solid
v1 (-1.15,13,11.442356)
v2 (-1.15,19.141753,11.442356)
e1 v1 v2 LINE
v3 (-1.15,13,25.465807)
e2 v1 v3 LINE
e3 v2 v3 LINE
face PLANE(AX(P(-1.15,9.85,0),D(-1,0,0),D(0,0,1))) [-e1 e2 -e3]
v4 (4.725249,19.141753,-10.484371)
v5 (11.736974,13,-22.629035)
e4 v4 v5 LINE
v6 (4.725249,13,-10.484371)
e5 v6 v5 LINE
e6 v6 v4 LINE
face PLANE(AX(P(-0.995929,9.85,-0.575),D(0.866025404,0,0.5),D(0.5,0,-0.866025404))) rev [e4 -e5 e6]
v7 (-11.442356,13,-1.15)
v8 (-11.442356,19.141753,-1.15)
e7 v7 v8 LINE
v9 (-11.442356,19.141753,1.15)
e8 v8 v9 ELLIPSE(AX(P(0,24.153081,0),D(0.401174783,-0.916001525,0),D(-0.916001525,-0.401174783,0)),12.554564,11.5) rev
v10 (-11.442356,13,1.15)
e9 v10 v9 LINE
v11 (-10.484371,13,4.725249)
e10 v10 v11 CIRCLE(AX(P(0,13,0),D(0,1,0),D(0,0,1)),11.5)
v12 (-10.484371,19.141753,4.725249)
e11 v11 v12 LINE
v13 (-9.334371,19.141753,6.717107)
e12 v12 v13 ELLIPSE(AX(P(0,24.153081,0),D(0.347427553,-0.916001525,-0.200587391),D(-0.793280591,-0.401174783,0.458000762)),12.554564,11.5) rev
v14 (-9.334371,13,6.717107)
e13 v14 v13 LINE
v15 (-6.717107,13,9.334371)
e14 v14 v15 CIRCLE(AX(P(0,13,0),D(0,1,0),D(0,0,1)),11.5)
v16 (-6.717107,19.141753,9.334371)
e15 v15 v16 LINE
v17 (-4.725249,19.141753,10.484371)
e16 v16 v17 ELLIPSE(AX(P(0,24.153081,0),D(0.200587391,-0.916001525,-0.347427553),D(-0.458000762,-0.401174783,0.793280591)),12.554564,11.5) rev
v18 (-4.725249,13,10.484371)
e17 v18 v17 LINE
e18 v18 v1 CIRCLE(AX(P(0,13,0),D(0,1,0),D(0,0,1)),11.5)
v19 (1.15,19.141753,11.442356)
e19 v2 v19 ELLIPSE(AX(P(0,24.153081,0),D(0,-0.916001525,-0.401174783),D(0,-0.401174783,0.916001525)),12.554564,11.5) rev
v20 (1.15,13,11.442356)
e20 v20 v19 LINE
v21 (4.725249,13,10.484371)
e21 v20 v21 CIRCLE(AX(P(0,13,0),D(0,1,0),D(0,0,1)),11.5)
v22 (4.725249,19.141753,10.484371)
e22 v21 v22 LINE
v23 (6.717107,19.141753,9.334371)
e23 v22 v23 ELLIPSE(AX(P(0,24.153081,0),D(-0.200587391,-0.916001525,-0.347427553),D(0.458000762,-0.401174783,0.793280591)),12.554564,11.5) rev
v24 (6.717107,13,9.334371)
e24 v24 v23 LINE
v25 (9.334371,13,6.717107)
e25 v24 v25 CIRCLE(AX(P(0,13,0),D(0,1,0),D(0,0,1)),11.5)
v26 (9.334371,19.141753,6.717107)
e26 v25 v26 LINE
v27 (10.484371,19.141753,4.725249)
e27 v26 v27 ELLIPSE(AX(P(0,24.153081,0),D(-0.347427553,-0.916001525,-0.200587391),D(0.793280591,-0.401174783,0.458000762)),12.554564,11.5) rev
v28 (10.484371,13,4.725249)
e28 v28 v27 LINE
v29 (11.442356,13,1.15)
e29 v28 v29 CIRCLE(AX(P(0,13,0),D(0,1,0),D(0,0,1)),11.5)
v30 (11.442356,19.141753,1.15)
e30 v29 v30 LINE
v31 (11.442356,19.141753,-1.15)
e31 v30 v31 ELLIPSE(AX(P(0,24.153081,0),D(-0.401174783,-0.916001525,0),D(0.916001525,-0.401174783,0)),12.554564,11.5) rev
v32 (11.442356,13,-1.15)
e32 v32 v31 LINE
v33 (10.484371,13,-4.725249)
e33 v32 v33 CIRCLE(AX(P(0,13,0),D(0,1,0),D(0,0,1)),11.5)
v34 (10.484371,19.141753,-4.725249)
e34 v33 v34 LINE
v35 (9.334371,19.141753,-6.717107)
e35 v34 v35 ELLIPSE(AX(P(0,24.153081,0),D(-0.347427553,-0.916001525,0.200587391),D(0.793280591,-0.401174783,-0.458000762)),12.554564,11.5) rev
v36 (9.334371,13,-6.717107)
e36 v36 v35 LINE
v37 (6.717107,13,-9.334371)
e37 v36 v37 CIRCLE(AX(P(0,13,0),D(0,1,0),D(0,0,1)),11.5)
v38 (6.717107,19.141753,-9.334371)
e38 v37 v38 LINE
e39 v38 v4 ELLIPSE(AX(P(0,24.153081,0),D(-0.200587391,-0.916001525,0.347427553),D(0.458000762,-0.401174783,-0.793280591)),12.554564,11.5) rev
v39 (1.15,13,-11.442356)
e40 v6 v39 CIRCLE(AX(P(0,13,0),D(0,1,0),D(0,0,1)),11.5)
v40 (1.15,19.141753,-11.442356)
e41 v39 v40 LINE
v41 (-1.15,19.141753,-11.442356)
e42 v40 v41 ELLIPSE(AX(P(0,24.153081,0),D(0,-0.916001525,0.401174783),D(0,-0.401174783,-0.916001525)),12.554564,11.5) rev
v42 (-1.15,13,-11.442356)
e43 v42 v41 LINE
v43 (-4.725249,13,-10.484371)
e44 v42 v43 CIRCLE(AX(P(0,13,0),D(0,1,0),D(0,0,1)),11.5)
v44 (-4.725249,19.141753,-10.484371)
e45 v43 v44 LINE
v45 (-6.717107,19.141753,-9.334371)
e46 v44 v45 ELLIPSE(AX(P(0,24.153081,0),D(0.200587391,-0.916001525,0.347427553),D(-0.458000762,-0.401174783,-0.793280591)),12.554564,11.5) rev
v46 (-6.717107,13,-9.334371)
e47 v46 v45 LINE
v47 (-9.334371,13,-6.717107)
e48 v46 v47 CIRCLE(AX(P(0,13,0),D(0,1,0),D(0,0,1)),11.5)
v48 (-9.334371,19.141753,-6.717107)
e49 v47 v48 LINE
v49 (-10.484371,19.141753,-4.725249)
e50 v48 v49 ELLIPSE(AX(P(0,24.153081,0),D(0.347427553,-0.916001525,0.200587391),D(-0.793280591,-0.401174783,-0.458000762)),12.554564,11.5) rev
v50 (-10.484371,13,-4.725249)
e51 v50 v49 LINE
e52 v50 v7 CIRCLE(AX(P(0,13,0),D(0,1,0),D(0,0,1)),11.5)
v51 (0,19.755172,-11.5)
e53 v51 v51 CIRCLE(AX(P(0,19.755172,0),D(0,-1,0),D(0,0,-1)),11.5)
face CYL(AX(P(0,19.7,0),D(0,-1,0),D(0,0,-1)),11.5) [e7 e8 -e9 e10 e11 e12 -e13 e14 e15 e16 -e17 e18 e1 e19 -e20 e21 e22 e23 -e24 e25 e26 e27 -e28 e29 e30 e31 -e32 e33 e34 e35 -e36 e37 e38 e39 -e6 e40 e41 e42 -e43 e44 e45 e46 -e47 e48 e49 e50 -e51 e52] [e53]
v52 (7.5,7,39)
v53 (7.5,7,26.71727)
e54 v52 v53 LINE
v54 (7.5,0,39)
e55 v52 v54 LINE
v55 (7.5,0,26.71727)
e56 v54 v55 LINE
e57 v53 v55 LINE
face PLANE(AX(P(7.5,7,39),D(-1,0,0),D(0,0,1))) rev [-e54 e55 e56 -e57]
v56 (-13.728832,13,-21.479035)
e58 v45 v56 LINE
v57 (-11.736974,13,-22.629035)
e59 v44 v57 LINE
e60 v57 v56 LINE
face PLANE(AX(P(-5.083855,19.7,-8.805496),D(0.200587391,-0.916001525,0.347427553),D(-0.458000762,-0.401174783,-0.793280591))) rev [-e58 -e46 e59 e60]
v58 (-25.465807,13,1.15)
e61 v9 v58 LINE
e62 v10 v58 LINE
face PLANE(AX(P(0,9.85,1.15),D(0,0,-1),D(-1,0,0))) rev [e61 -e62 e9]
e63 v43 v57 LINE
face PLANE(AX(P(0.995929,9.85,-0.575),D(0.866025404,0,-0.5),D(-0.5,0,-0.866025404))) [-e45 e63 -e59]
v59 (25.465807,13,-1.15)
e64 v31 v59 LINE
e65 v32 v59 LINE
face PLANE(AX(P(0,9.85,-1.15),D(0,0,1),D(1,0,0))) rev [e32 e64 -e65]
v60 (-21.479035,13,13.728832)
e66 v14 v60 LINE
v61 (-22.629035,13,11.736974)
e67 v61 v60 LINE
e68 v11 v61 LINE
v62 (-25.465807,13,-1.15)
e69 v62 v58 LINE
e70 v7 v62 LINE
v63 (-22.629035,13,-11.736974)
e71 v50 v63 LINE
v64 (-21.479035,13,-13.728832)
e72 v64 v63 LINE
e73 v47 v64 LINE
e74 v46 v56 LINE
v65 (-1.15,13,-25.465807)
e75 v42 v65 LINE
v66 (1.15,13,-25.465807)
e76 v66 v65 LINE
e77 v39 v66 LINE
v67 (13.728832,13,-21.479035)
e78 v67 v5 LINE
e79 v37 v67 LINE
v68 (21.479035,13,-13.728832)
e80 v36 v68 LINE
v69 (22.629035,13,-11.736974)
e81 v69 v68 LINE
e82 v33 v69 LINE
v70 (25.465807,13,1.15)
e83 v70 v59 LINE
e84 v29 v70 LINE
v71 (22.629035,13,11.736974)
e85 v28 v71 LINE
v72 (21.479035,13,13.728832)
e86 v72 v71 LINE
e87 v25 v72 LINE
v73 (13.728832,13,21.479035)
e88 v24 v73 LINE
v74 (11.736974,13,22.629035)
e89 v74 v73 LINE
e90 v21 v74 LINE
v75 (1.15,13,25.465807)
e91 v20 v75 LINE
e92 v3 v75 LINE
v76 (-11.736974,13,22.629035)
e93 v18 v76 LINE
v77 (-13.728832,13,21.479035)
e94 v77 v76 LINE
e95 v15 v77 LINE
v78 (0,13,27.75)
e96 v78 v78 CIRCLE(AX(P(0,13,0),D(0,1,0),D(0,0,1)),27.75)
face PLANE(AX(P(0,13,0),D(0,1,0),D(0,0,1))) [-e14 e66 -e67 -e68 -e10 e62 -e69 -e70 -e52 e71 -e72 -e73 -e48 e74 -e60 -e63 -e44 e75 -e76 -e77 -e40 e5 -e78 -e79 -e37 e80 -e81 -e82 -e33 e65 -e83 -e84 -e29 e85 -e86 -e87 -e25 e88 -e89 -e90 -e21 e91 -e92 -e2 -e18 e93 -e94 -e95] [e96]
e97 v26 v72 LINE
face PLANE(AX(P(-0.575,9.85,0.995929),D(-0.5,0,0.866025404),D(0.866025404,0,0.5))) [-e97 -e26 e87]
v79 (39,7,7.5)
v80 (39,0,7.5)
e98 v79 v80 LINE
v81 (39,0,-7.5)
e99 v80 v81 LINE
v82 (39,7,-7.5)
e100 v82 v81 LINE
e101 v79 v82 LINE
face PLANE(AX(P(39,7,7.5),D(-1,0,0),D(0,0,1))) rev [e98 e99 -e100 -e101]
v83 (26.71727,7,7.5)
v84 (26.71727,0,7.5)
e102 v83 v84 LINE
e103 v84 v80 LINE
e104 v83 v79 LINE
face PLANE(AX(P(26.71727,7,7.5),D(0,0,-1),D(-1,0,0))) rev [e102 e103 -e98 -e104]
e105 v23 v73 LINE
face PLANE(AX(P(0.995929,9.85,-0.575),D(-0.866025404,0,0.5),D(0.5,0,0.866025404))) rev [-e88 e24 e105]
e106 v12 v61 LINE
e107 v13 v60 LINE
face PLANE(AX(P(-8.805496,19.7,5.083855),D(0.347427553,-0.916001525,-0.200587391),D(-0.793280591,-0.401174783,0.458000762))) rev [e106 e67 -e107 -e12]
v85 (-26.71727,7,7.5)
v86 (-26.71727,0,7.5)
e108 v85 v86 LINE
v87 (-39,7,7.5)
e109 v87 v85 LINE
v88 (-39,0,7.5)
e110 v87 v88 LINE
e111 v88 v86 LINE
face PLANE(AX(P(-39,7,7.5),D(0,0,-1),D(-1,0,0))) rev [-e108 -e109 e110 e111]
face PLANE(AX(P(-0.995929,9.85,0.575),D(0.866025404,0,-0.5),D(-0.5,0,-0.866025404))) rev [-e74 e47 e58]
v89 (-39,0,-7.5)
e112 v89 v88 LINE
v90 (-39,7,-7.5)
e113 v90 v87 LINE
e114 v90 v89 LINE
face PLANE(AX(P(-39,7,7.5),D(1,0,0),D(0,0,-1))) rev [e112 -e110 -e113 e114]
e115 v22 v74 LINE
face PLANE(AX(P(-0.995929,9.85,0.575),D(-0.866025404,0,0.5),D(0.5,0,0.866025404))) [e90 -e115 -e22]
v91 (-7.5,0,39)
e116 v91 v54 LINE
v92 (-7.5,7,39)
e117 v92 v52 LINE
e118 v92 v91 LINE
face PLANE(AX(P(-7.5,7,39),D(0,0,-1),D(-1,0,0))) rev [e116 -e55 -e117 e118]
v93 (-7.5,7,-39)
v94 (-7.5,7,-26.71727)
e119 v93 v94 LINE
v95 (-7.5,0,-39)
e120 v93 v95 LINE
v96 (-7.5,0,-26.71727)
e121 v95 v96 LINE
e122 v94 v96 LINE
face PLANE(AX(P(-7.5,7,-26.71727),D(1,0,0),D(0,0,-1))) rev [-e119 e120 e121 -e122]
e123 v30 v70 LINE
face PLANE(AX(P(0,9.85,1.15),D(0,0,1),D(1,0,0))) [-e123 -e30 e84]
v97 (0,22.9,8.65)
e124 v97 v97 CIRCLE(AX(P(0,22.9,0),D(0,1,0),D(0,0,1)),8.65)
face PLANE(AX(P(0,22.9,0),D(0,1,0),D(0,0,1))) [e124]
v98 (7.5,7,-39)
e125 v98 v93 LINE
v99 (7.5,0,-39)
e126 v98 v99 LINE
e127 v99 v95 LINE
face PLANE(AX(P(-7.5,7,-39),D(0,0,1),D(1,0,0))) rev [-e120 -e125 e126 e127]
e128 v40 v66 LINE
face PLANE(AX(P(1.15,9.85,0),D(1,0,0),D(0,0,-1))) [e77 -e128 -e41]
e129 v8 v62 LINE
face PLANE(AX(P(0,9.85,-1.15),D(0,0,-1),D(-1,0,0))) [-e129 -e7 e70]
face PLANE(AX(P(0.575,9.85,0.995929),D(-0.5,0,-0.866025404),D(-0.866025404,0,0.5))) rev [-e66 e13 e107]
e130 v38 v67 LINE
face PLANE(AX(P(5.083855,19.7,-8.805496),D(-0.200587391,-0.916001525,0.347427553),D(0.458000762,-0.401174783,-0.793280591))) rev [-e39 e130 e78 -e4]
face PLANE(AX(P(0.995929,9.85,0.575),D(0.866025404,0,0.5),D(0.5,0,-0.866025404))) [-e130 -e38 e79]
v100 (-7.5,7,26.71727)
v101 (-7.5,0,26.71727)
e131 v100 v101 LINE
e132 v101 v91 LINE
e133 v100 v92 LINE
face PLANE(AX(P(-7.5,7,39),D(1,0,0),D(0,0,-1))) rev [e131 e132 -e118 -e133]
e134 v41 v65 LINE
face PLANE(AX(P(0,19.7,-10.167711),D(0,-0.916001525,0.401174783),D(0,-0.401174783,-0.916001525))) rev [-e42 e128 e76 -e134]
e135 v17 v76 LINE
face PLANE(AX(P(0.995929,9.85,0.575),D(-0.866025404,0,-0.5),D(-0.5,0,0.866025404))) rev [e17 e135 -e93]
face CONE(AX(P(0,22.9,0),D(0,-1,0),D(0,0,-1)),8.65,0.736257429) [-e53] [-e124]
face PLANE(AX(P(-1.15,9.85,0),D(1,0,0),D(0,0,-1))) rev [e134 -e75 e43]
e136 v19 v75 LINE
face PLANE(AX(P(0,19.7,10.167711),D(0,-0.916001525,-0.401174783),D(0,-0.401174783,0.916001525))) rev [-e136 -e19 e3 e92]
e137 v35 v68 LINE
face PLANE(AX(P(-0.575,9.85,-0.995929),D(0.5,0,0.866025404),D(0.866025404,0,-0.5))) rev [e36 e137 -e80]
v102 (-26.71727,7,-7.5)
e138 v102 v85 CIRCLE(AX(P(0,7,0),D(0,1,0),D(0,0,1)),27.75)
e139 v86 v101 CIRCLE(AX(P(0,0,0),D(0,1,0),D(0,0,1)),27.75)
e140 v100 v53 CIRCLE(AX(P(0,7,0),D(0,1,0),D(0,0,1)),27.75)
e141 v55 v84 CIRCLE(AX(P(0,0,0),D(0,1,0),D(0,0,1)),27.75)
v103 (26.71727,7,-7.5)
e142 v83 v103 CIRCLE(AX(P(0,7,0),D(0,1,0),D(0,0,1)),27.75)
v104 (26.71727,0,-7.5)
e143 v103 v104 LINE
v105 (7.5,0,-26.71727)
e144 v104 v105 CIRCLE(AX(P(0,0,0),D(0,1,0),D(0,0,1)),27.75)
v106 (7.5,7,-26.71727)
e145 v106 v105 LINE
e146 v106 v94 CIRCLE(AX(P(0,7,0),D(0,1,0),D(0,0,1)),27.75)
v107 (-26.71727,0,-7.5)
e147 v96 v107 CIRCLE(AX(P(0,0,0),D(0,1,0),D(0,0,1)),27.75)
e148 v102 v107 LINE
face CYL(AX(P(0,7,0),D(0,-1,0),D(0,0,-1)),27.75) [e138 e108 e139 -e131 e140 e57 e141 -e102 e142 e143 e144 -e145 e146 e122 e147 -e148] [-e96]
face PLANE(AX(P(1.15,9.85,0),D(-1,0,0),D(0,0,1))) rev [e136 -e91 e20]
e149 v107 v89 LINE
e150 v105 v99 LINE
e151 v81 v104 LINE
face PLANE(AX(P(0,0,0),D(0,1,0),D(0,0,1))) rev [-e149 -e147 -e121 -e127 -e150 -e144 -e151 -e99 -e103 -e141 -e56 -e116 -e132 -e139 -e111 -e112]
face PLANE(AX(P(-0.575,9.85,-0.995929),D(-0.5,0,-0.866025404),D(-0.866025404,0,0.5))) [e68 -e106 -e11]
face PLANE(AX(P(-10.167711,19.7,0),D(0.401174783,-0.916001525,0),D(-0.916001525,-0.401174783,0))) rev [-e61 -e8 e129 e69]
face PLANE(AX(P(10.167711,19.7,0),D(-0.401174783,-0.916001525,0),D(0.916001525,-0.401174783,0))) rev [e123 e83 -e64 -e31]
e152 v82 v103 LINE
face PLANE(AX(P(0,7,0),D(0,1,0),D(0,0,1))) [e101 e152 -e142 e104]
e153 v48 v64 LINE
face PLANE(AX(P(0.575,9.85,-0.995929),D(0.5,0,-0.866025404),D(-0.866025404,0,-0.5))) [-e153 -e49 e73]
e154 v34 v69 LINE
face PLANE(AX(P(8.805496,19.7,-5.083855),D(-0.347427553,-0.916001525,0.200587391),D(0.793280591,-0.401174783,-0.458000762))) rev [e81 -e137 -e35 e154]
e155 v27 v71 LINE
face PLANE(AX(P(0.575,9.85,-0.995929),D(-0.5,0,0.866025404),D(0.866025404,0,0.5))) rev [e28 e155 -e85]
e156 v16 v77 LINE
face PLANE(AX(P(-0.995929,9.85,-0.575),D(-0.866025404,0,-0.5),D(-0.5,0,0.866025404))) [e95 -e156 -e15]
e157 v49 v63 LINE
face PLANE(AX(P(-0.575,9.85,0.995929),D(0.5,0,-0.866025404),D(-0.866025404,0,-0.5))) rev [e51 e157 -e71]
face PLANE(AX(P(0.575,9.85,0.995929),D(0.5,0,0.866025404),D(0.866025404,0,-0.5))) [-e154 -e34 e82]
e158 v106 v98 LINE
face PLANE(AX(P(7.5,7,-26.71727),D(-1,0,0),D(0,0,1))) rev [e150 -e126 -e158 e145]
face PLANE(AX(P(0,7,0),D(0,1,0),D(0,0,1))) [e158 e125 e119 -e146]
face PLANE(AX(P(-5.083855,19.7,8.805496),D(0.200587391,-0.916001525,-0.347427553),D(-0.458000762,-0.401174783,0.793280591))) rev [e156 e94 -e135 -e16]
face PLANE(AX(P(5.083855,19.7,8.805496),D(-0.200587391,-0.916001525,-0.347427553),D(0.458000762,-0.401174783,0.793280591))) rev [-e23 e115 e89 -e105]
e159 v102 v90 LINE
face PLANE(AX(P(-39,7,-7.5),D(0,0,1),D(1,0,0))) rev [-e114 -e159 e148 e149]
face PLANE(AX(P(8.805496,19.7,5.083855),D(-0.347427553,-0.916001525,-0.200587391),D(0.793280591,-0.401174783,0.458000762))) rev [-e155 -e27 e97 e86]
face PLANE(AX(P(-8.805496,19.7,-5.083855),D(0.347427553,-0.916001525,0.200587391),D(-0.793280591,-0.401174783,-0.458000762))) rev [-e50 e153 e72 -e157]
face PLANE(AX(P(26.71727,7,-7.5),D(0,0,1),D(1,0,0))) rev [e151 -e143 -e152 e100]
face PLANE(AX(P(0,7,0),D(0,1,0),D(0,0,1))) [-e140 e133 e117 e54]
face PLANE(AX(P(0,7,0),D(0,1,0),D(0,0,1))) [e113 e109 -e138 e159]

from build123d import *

# Parameters (mm, degrees)
SALIENTE_EXTRUIR1_DEPTH = 7
CROQUIS2_R              = 27.75
SALIENTE_EXTRUIR2_DEPTH = 6
CROQUIS3_R              = 11.5
SALIENTE_EXTRUIR3_DEPTH = 6.7
NERVIO5_START           = -18.11144548
NERVIO5_OUTLINE_W       = 2.3
NERVIO5_OUTLINE_H       = 7.124259241
NERVIO5_DEPTH           = 15.309418884
MATRIZC1_COUNT          = 12
CROQUIS5_R              = 8.65
SALIENTE_EXTRUIR4_DEPTH = 3.2
CHAFL_N1_SIZE           = 2.9
CHAFL_N1_SIZE_2         = 3.2


# Read off the part's stored shape, not the designer's step: Nervio5
with BuildPart() as part:
    # Croquis1 → Saliente-Extruir1 (new body)
    with BuildSketch(Plane(origin=(0, 0, 0), x_dir=(1, 0, 0), z_dir=(0, 1, 0))):
        with BuildLine():
            Line((-7.5, -39), (7.5, -39))
            Line((7.5, -39), (7.5, -26.717269696))
            ThreePointArc((7.5, -26.717269696), (19.622213178, -19.622213178), (26.717269696, -7.5))
            Line((26.717269696, -7.5), (39, -7.5))
            Line((39, -7.5), (39, 7.5))
            Line((39, 7.5), (26.717269696, 7.5))
            ThreePointArc((26.717269696, 7.5), (19.622213178, 19.622213178), (7.5, 26.717269696))
            Line((7.5, 26.717269696), (7.5, 39))
            Line((7.5, 39), (-7.5, 39))
            Line((-7.5, 39), (-7.5, 26.717269696))
            ThreePointArc((-7.5, 26.717269696), (-19.622213178, 19.622213178), (-26.717269696, 7.5))
            Line((-26.717269696, 7.5), (-39, 7.5))
            Line((-39, 7.5), (-39, -7.5))
            Line((-39, -7.5), (-26.717269696, -7.5))
            ThreePointArc((-26.717269696, -7.5), (-19.622213178, -19.622213178), (-7.5, -26.717269696))
            Line((-7.5, -26.717269696), (-7.5, -39))
        make_face()
    extrude(amount=SALIENTE_EXTRUIR1_DEPTH)

    # Croquis2 → Saliente-Extruir2 (add)
    with BuildSketch(Plane(origin=(0, 7, 0), x_dir=(1, 0, 0), z_dir=(0, 1, 0))):
        with Locations(Location((0, 0, 0), (0, 0, 105.680350135))):
            Circle(CROQUIS2_R)
    extrude(amount=SALIENTE_EXTRUIR2_DEPTH)

    # Croquis3 → Saliente-Extruir3 (add)
    with BuildSketch(Plane(origin=(0, 13, 0), x_dir=(1, 0, 0), z_dir=(0, 1, 0))):
        with Locations(Location((0, 0, 0), (0, 0, 270))):
            Circle(CROQUIS3_R)
    extrude(amount=SALIENTE_EXTRUIR3_DEPTH)

    # Nervio5 outline → Nervio5 (add)
    with BuildSketch(Plane(origin=(0, 0, 0), x_dir=(1, 0, 0), z_dir=(0, 0.4011747826314881, 0.9160015249881293)).offset(NERVIO5_START)):
        with Locations((0, 18.562129621)):
            Rectangle(NERVIO5_OUTLINE_W, NERVIO5_OUTLINE_H)
    nervio5 = extrude(amount=NERVIO5_DEPTH)

    # MatrizC1: Nervio5 ×12 about axis
    matrizc1_axis = Axis((0, 0, 0), (0, 1, 0))
    for i in range(1, MATRIZC1_COUNT):
        add(nervio5.rotate(matrizc1_axis, i * 360 / MATRIZC1_COUNT))

    # Croquis5 → Saliente-Extruir4 (add)
    with BuildSketch(Plane(origin=(0, 19.7, 0), x_dir=(1, 0, 0), z_dir=(0, 1, 0))):
        with Locations(Location((0, 0, 0), (0, 0, 270))):
            Circle(CROQUIS5_R)
    extrude(amount=SALIENTE_EXTRUIR4_DEPTH)

    # Chaflán1
    # the kernel refuses this chamfer: 3.2, 2.9 mm, written as the material it adds along each edge
    with BuildSketch(Plane(origin=(0, 19.7, 0), x_dir=(0, 0, 1), z_dir=(-1, 0, 0))) as chafl_n1_piece_1_section:
        Polygon((8.65 + CHAFL_N1_SIZE, 0), (8.65, CHAFL_N1_SIZE_2), (8.65, 0), align=None)
    chafl_n1_piece_1 = revolve(axis=Axis((0, 19.7, 0), (0, 1, 0)), mode=Mode.PRIVATE)
    chafl_n1_piece_1 = chafl_n1_piece_1 & Plane(origin=(0, 21.282250987, 0), x_dir=(0, 0, 1), z_dir=(0, -1, 0)) * Cylinder(11.5, 47, mode=Mode.PRIVATE)
    chafl_n1_piece_1 = split(chafl_n1_piece_1, bisect_by=Plane(origin=(0, 22.9, -10.02497493), z_dir=(0, -1, 0)), keep=Keep.TOP, mode=Mode.PRIVATE)
    add(chafl_n1_piece_1)


solid = part.part
